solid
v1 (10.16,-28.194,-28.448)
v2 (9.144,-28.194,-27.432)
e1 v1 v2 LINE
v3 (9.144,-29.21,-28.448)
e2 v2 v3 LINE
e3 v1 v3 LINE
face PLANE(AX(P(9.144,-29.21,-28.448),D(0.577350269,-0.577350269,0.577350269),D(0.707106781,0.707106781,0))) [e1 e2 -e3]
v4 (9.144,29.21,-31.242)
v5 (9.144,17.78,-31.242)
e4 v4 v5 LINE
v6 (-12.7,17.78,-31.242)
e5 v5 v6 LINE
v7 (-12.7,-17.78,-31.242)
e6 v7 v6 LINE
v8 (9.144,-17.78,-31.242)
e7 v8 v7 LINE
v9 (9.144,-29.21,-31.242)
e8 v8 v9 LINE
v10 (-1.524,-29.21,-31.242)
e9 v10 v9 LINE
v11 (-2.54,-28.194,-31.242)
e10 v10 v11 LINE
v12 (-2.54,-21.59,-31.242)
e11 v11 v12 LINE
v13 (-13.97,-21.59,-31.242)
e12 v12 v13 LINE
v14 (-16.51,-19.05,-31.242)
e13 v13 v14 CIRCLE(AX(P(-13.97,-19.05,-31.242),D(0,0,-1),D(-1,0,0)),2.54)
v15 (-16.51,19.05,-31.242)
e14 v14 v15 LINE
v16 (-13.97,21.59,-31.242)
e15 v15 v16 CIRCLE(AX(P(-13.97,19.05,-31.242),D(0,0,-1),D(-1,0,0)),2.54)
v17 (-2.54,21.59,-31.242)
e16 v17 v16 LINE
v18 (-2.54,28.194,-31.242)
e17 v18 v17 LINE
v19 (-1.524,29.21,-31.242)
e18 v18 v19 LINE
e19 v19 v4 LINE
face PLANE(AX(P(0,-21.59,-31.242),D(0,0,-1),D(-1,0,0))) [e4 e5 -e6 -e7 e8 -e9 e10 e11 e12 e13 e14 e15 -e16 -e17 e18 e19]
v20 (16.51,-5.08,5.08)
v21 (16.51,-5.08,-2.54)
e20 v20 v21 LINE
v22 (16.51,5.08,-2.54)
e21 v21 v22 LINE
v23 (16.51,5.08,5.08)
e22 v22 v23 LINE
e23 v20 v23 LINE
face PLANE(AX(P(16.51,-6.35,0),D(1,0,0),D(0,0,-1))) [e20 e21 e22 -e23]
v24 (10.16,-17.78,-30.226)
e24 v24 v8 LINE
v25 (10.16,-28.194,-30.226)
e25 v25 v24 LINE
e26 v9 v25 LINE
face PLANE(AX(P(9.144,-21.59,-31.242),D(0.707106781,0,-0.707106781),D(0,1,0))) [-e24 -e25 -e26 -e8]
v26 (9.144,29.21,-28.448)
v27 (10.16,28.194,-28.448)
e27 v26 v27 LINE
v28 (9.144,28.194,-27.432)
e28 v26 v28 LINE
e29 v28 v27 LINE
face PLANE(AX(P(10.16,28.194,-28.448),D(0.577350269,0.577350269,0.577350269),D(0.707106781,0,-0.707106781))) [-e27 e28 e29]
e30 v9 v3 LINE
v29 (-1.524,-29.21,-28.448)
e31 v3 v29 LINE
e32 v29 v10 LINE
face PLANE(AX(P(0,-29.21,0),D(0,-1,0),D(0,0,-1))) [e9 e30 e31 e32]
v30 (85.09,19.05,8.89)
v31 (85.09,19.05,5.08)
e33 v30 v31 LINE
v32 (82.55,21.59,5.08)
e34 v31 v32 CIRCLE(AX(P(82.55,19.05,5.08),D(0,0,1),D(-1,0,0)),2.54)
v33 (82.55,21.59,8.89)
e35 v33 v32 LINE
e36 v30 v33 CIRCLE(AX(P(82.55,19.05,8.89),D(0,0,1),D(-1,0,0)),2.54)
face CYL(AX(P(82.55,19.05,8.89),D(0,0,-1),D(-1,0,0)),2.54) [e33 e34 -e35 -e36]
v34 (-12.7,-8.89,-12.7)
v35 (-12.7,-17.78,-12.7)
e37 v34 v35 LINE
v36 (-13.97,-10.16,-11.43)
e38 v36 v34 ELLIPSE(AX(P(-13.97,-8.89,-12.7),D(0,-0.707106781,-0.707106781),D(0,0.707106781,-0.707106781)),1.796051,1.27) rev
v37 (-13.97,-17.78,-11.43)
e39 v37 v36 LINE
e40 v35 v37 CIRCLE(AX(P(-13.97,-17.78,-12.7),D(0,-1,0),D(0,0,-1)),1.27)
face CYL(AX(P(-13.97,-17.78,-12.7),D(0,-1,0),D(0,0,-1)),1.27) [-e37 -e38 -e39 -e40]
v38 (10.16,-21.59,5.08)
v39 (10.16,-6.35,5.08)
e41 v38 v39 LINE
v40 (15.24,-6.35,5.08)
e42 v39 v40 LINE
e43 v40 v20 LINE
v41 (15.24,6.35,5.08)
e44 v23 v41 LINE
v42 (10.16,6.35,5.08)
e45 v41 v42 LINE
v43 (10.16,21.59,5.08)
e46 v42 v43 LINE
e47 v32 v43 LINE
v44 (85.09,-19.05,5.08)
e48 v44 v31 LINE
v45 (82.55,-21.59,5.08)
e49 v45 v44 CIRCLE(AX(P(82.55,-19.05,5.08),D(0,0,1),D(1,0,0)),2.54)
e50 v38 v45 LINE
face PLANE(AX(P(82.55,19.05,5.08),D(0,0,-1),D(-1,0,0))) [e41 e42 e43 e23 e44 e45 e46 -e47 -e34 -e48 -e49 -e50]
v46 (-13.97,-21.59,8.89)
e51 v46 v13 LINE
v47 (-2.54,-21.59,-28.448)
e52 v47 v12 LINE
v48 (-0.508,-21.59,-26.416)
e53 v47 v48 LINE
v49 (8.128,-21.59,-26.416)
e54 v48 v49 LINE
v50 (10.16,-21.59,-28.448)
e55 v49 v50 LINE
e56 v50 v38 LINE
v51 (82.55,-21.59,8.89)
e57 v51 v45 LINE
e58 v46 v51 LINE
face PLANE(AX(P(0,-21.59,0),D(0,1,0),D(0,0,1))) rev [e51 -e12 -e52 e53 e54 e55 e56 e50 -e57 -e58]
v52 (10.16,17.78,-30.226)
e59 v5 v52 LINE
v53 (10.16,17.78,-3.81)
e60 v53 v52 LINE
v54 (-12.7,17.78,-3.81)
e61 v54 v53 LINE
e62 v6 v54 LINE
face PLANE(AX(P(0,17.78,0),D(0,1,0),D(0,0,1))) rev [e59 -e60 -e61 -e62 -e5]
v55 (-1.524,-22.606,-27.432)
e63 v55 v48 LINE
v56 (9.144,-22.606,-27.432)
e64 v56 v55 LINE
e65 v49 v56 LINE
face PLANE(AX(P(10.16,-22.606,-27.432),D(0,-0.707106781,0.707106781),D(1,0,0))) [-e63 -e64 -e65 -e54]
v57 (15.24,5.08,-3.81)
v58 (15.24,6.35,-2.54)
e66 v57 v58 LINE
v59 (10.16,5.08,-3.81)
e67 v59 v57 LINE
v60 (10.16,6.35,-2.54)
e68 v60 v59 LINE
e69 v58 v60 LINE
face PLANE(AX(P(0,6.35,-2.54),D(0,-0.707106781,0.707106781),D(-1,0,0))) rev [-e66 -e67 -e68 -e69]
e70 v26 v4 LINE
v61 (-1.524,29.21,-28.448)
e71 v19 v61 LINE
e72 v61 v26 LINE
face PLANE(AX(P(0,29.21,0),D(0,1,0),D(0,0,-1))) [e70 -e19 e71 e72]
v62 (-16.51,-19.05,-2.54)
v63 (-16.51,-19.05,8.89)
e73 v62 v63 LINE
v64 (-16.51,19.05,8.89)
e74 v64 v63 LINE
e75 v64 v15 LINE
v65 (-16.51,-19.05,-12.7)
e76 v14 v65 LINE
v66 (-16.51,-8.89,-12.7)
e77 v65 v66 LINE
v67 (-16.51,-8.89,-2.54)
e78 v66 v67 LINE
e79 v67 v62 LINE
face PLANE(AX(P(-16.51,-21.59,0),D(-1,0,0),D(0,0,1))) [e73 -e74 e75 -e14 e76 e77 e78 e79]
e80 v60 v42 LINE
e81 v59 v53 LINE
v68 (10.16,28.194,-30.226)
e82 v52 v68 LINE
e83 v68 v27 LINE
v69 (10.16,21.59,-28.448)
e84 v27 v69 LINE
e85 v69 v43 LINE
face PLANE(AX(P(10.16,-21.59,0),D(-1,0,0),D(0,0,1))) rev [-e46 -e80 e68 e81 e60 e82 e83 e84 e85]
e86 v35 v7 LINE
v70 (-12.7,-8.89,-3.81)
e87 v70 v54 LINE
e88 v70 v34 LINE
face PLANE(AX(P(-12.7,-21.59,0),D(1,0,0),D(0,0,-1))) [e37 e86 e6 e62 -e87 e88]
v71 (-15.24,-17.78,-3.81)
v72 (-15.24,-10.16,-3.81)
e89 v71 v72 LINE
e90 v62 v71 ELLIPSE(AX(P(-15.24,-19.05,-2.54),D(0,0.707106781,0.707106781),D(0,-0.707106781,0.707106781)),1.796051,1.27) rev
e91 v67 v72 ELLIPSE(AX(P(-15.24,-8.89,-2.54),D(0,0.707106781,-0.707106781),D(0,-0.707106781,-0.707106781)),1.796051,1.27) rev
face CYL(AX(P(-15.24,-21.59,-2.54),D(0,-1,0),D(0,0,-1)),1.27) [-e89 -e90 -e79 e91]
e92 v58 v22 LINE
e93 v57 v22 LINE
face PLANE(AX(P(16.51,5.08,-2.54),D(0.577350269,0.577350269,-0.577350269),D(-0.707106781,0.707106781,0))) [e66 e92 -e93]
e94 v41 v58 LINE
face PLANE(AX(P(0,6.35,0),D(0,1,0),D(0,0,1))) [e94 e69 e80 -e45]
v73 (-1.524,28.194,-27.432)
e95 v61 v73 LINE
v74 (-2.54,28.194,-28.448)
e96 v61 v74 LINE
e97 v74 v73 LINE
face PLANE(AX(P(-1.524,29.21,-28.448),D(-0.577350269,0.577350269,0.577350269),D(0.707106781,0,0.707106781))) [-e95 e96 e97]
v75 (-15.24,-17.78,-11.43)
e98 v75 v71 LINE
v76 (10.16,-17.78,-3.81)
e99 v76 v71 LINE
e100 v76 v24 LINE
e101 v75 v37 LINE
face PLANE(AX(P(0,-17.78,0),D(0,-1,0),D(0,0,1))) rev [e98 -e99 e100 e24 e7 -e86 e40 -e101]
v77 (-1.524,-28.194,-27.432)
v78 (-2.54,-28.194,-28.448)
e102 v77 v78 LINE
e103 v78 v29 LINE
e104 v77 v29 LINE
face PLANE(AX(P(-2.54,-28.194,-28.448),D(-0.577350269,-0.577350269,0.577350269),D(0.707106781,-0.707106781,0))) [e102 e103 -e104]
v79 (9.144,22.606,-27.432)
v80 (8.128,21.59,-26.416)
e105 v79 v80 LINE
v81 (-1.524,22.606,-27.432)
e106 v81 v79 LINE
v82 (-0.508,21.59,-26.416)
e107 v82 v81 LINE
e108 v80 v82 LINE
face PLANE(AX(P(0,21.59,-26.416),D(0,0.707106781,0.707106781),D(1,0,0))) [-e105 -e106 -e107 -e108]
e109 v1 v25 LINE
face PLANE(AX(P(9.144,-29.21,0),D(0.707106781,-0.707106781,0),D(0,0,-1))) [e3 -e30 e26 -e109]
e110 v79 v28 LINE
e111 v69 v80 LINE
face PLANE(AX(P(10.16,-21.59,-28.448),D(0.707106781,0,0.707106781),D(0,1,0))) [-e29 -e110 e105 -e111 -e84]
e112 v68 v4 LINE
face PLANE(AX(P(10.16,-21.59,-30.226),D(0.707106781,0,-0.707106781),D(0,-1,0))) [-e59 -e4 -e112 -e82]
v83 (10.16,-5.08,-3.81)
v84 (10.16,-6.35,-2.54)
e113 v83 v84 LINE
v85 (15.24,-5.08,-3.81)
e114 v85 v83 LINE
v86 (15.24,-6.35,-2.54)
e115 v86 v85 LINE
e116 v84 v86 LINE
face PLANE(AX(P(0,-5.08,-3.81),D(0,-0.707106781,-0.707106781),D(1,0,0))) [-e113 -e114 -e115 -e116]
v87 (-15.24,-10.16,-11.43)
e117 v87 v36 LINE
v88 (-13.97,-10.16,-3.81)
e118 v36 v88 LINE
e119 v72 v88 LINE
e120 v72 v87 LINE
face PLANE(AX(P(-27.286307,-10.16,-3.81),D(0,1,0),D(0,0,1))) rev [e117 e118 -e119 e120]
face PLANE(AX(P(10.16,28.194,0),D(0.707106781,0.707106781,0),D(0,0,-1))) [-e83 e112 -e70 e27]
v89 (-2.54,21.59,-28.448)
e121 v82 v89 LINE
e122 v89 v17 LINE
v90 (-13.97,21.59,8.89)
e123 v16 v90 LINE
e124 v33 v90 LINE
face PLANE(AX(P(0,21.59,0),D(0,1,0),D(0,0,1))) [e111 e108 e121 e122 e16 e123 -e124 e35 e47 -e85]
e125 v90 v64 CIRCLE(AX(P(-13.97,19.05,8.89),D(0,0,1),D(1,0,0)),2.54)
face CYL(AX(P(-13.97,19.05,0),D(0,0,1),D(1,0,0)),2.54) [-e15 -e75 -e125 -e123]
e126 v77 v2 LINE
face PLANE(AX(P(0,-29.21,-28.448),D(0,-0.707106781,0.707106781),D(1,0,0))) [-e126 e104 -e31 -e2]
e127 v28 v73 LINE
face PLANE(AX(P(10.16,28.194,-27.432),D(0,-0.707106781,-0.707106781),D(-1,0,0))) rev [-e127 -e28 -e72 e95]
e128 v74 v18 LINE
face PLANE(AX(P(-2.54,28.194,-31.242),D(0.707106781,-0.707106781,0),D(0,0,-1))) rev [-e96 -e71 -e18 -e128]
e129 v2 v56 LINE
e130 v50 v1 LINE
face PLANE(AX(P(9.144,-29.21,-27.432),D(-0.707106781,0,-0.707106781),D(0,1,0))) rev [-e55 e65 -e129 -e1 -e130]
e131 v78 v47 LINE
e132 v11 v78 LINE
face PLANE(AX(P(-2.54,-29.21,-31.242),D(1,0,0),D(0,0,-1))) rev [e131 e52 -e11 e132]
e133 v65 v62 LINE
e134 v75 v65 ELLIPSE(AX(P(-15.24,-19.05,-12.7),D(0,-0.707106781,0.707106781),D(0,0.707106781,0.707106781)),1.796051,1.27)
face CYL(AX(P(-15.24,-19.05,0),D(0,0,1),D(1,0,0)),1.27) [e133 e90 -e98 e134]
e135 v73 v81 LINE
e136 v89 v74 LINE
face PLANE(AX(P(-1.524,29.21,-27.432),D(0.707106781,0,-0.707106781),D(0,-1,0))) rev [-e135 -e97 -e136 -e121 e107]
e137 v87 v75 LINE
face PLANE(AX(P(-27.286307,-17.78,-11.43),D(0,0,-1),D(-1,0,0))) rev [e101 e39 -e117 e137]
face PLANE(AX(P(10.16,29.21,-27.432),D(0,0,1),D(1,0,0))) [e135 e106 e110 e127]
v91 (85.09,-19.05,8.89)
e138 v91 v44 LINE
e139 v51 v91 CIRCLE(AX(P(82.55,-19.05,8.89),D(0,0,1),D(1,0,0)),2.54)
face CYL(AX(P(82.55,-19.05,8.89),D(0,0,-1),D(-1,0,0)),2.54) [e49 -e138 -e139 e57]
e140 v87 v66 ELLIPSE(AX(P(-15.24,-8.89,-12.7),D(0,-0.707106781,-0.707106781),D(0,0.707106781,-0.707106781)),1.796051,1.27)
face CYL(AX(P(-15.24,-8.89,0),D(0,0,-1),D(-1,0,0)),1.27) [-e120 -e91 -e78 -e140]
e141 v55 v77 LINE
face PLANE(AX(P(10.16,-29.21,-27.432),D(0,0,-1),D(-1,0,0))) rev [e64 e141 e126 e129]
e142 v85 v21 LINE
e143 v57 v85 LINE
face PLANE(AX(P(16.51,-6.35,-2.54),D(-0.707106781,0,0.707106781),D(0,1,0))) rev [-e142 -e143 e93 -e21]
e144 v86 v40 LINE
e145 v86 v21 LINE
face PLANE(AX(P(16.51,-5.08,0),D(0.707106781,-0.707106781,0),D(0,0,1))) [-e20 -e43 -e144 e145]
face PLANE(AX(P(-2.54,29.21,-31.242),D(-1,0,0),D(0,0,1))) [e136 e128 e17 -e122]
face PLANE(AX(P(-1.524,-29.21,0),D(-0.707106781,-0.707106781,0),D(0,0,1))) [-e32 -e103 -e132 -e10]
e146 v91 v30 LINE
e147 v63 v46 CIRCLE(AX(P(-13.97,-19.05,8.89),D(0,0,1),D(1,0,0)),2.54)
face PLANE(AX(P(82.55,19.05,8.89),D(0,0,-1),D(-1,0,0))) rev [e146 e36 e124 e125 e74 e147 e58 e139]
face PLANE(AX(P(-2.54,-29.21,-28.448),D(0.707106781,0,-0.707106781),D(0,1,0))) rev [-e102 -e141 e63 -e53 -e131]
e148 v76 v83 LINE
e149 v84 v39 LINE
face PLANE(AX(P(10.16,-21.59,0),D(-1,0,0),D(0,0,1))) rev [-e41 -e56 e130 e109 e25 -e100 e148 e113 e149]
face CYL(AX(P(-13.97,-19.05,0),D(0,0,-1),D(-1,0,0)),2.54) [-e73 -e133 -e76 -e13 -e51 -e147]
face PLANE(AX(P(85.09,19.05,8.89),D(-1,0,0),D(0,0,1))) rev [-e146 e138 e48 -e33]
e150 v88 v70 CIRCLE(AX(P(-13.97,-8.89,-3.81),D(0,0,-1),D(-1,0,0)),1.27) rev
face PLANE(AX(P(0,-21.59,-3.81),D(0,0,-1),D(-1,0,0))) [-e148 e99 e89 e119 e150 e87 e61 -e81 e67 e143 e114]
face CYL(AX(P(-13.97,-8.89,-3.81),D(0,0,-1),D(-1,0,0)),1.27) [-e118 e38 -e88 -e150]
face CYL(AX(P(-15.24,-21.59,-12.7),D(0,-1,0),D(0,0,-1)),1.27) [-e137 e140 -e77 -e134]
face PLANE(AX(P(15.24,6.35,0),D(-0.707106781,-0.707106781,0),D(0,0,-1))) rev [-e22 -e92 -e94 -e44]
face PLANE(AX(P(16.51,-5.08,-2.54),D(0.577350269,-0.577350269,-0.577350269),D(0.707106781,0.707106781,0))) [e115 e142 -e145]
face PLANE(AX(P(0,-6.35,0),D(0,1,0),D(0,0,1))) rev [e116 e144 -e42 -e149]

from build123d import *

# Parameters (mm, degrees)
BOSS_EXTRUDE1_DEPTH      = 21.59
BOSS_EXTRUDE1_DEPTH_BACK = 21.59
BOSS_EXTRUDE2_DEPTH      = 6.35
BOSS_EXTRUDE2_DEPTH_BACK = 6.35
SKETCH1_4_W              = 6.35
SKETCH1_4_H              = 3.81
SKETCH3_W                = 26.67
SKETCH3_H                = 31.242
BOSS_EXTRUDE3_DEPTH      = 3.81
FILLET1_R                = 2.54
CHAMFER1_SIZE            = 1.27
SKETCH9_W                = 12.7
SKETCH9_H                = 3.81
BOSS_EXTRUDE6_DEPTH      = 7.62
CHAMFER2_SIZE            = 1.016
CHAMFER3_SIZE            = 1.016
CHAMFER2_OF_MIRROR2_SIZE = 1.016
BOSS_EXTRUDE7_START      = 5.08
BOSS_EXTRUDE7_DEPTH      = 5.08
BOSS_EXTRUDE8_START      = 3.81
BOSS_EXTRUDE8_DEPTH      = 3.81
CHAMFER4_SIZE            = 1.016
SKETCH12_W               = 7.62
SKETCH12_H               = 7.62
CUT_EXTRUDE2_DEPTH       = 3.81
FILLET8_R                = 1.27


with BuildPart() as part:
    # Sketch1 → Boss-Extrude1 (new, two sides: drawn at the far end of the back side and taken through both)
    with BuildSketch(Plane(origin=(0, 0, 0), x_dir=(1, 0, 0), z_dir=(0, 1, 0)).offset(-BOSS_EXTRUDE1_DEPTH_BACK)):
        Polygon((-16.51, 31.242), (-16.51, 0), (10.16, 0), (10.16, 3.81), (-12.7, 3.81), (-12.7, 31.242), align=None)
    extrude(amount=BOSS_EXTRUDE1_DEPTH + BOSS_EXTRUDE1_DEPTH_BACK)

    # Sketch1<4> → Boss-Extrude2 (add, two sides: drawn at the far end of the back side and taken through both)
    with BuildSketch(Plane(origin=(0, 0, 0), x_dir=(1, 0, 0), z_dir=(0, 1, 0)).offset(-BOSS_EXTRUDE2_DEPTH_BACK)):
        with Locations((13.335, 1.905)):
            Rectangle(SKETCH1_4_W, SKETCH1_4_H)
    extrude(amount=BOSS_EXTRUDE2_DEPTH + BOSS_EXTRUDE2_DEPTH_BACK)

    # Sketch3 → Boss-Extrude3 (add)
    with BuildSketch(Plane(origin=(0, 21.59, 0), x_dir=(1, 0, 0), z_dir=(0, 1, 0))):
        with Locations((-3.175, 15.621)):
            Rectangle(SKETCH3_W, SKETCH3_H)
    boss_extrude3 = extrude(amount=-BOSS_EXTRUDE3_DEPTH)

    # Mirror1: Boss-Extrude3 across plane
    add(boss_extrude3.mirror(Plane.ZX))

    # Fillet1
    fillet1_edges = [part.edges().sort_by_distance(p)[0] for p in [
        (-16.51, -21.59, -15.621),
        (-16.51, 21.59, -15.621),
    ]]
    fillet(fillet1_edges, radius=FILLET1_R)

    # Chamfer1
    chamfer1_edges = [part.edges().sort_by_distance(p)[0] for p in [
        (13.335, -6.35, -3.81),
        (16.51, 0, -3.81),
        (16.51, -6.35, -1.905),
        (13.335, 6.35, -3.81),
        (16.51, 6.35, -1.905),
    ]]
    chamfer(chamfer1_edges, length=CHAMFER1_SIZE)

    # Sketch9 → Boss-Extrude6 (add)
    with BuildSketch(Plane.XZ.offset(21.59)):
        with Locations((3.81, -29.337)):
            Rectangle(SKETCH9_W, SKETCH9_H)
    boss_extrude6 = extrude(amount=BOSS_EXTRUDE6_DEPTH)

    # Chamfer2
    chamfer2_edges = [part.edges().sort_by_distance(p)[0] for p in [
        (10.16, -25.4, -27.432),
        (-2.54, -25.4, -27.432),
        (10.16, -29.21, -29.337),
        (3.81, -29.21, -27.432),
        (-2.54, -29.21, -29.337),
    ]]
    chamfer(chamfer2_edges, length=CHAMFER2_SIZE)

    # Chamfer3
    chamfer3_edges = [part.edges().sort_by_distance(p)[0] for p in [
        (3.81, -21.59, -27.432),
        (10.16, -22.987, -31.242),
    ]]
    chamfer(chamfer3_edges, length=CHAMFER3_SIZE)

    # Mirror2: Boss-Extrude6 across plane
    add(boss_extrude6.mirror(Plane.ZX))

    # Chamfer2 of Mirror2
    chamfer2_of_mirror2_edges = [part.edges().sort_by_distance(p)[0] for p in [
        (10.16, 25.4, -27.432),
        (-2.54, 25.4, -27.432),
        (10.16, 29.21, -29.337),
        (3.81, 29.21, -27.432),
        (-2.54, 29.21, -29.337),
    ]]
    chamfer(chamfer2_of_mirror2_edges, length=CHAMFER2_OF_MIRROR2_SIZE)

    # Sketch10 → Boss-Extrude7 (add)
    with BuildSketch(Plane.XY.offset(BOSS_EXTRUDE7_START)):
        with BuildLine():
            Line((10.16, 6.35), (10.16, 21.59))
            Line((10.16, 21.59), (-13.97, 21.59))
            ThreePointArc((-13.97, 21.59), (-15.766051224, 20.846051224), (-16.51, 19.05))
            Line((-16.51, 19.05), (-16.51, -19.05))
            ThreePointArc((-16.51, -19.05), (-15.766051224, -20.846051224), (-13.97, -21.59))
            Line((-13.97, -21.59), (10.16, -21.59))
            Line((10.16, -21.59), (10.16, -6.35))
            Line((10.16, -6.35), (15.24, -6.35))
            Line((15.24, -6.35), (16.51, -5.08))
            Line((16.51, -5.08), (16.51, 5.08))
            Line((16.51, 5.08), (15.24, 6.35))
            Line((15.24, 6.35), (10.16, 6.35))
        make_face()
    extrude(amount=-BOSS_EXTRUDE7_DEPTH)

    # Sketch11 → Boss-Extrude8 (add)
    with BuildSketch(Plane.XY.offset(5.08).offset(BOSS_EXTRUDE8_START)):
        with BuildLine():
            Line((-13.97, 21.59), (82.55, 21.59))
            ThreePointArc((82.55, 21.59), (84.346051224, 20.846051224), (85.09, 19.05))
            Line((85.09, 19.05), (85.09, -19.05))
            ThreePointArc((85.09, -19.05), (84.346051224, -20.846051224), (82.55, -21.59))
            Line((82.55, -21.59), (-13.97, -21.59))
            ThreePointArc((-13.97, -21.59), (-15.766051224, -20.846051224), (-16.51, -19.05))
            Line((-16.51, -19.05), (-16.51, 19.05))
            ThreePointArc((-16.51, 19.05), (-15.766051224, 20.846051224), (-13.97, 21.59))
        make_face()
    extrude(amount=-BOSS_EXTRUDE8_DEPTH)

    # Chamfer4
    chamfer4_edges = [part.edges().sort_by_distance(p)[0] for p in [
        (3.81, 21.59, -27.432),
        (10.16, 22.987, -31.242),
    ]]
    chamfer(chamfer4_edges, length=CHAMFER4_SIZE)

    # Sketch12 → Cut-Extrude2 (cut)
    with BuildSketch(Plane(origin=(-12.7, 0, 0), x_dir=(0, 0, -1), z_dir=(1, 0, 0))):
        with Locations((7.62, -13.97)):
            Rectangle(SKETCH12_W, SKETCH12_H)
    extrude(amount=-CUT_EXTRUDE2_DEPTH, mode=Mode.SUBTRACT)

    # Fillet8
    fillet8_edges = [part.edges().sort_by_distance(p)[0] for p in [
        (-12.7, -13.97, -11.43),
        (-12.7, -10.16, -7.62),
        (-16.51, -17.78, -7.62),
        (-16.51, -13.97, -11.43),
        (-16.51, -10.16, -7.62),
        (-16.51, -13.97, -3.81),
    ]]
    fillet(fillet8_edges, radius=FILLET8_R - 0.0001)  # a hair under: the kernel refuses the full size


solid = part.part
